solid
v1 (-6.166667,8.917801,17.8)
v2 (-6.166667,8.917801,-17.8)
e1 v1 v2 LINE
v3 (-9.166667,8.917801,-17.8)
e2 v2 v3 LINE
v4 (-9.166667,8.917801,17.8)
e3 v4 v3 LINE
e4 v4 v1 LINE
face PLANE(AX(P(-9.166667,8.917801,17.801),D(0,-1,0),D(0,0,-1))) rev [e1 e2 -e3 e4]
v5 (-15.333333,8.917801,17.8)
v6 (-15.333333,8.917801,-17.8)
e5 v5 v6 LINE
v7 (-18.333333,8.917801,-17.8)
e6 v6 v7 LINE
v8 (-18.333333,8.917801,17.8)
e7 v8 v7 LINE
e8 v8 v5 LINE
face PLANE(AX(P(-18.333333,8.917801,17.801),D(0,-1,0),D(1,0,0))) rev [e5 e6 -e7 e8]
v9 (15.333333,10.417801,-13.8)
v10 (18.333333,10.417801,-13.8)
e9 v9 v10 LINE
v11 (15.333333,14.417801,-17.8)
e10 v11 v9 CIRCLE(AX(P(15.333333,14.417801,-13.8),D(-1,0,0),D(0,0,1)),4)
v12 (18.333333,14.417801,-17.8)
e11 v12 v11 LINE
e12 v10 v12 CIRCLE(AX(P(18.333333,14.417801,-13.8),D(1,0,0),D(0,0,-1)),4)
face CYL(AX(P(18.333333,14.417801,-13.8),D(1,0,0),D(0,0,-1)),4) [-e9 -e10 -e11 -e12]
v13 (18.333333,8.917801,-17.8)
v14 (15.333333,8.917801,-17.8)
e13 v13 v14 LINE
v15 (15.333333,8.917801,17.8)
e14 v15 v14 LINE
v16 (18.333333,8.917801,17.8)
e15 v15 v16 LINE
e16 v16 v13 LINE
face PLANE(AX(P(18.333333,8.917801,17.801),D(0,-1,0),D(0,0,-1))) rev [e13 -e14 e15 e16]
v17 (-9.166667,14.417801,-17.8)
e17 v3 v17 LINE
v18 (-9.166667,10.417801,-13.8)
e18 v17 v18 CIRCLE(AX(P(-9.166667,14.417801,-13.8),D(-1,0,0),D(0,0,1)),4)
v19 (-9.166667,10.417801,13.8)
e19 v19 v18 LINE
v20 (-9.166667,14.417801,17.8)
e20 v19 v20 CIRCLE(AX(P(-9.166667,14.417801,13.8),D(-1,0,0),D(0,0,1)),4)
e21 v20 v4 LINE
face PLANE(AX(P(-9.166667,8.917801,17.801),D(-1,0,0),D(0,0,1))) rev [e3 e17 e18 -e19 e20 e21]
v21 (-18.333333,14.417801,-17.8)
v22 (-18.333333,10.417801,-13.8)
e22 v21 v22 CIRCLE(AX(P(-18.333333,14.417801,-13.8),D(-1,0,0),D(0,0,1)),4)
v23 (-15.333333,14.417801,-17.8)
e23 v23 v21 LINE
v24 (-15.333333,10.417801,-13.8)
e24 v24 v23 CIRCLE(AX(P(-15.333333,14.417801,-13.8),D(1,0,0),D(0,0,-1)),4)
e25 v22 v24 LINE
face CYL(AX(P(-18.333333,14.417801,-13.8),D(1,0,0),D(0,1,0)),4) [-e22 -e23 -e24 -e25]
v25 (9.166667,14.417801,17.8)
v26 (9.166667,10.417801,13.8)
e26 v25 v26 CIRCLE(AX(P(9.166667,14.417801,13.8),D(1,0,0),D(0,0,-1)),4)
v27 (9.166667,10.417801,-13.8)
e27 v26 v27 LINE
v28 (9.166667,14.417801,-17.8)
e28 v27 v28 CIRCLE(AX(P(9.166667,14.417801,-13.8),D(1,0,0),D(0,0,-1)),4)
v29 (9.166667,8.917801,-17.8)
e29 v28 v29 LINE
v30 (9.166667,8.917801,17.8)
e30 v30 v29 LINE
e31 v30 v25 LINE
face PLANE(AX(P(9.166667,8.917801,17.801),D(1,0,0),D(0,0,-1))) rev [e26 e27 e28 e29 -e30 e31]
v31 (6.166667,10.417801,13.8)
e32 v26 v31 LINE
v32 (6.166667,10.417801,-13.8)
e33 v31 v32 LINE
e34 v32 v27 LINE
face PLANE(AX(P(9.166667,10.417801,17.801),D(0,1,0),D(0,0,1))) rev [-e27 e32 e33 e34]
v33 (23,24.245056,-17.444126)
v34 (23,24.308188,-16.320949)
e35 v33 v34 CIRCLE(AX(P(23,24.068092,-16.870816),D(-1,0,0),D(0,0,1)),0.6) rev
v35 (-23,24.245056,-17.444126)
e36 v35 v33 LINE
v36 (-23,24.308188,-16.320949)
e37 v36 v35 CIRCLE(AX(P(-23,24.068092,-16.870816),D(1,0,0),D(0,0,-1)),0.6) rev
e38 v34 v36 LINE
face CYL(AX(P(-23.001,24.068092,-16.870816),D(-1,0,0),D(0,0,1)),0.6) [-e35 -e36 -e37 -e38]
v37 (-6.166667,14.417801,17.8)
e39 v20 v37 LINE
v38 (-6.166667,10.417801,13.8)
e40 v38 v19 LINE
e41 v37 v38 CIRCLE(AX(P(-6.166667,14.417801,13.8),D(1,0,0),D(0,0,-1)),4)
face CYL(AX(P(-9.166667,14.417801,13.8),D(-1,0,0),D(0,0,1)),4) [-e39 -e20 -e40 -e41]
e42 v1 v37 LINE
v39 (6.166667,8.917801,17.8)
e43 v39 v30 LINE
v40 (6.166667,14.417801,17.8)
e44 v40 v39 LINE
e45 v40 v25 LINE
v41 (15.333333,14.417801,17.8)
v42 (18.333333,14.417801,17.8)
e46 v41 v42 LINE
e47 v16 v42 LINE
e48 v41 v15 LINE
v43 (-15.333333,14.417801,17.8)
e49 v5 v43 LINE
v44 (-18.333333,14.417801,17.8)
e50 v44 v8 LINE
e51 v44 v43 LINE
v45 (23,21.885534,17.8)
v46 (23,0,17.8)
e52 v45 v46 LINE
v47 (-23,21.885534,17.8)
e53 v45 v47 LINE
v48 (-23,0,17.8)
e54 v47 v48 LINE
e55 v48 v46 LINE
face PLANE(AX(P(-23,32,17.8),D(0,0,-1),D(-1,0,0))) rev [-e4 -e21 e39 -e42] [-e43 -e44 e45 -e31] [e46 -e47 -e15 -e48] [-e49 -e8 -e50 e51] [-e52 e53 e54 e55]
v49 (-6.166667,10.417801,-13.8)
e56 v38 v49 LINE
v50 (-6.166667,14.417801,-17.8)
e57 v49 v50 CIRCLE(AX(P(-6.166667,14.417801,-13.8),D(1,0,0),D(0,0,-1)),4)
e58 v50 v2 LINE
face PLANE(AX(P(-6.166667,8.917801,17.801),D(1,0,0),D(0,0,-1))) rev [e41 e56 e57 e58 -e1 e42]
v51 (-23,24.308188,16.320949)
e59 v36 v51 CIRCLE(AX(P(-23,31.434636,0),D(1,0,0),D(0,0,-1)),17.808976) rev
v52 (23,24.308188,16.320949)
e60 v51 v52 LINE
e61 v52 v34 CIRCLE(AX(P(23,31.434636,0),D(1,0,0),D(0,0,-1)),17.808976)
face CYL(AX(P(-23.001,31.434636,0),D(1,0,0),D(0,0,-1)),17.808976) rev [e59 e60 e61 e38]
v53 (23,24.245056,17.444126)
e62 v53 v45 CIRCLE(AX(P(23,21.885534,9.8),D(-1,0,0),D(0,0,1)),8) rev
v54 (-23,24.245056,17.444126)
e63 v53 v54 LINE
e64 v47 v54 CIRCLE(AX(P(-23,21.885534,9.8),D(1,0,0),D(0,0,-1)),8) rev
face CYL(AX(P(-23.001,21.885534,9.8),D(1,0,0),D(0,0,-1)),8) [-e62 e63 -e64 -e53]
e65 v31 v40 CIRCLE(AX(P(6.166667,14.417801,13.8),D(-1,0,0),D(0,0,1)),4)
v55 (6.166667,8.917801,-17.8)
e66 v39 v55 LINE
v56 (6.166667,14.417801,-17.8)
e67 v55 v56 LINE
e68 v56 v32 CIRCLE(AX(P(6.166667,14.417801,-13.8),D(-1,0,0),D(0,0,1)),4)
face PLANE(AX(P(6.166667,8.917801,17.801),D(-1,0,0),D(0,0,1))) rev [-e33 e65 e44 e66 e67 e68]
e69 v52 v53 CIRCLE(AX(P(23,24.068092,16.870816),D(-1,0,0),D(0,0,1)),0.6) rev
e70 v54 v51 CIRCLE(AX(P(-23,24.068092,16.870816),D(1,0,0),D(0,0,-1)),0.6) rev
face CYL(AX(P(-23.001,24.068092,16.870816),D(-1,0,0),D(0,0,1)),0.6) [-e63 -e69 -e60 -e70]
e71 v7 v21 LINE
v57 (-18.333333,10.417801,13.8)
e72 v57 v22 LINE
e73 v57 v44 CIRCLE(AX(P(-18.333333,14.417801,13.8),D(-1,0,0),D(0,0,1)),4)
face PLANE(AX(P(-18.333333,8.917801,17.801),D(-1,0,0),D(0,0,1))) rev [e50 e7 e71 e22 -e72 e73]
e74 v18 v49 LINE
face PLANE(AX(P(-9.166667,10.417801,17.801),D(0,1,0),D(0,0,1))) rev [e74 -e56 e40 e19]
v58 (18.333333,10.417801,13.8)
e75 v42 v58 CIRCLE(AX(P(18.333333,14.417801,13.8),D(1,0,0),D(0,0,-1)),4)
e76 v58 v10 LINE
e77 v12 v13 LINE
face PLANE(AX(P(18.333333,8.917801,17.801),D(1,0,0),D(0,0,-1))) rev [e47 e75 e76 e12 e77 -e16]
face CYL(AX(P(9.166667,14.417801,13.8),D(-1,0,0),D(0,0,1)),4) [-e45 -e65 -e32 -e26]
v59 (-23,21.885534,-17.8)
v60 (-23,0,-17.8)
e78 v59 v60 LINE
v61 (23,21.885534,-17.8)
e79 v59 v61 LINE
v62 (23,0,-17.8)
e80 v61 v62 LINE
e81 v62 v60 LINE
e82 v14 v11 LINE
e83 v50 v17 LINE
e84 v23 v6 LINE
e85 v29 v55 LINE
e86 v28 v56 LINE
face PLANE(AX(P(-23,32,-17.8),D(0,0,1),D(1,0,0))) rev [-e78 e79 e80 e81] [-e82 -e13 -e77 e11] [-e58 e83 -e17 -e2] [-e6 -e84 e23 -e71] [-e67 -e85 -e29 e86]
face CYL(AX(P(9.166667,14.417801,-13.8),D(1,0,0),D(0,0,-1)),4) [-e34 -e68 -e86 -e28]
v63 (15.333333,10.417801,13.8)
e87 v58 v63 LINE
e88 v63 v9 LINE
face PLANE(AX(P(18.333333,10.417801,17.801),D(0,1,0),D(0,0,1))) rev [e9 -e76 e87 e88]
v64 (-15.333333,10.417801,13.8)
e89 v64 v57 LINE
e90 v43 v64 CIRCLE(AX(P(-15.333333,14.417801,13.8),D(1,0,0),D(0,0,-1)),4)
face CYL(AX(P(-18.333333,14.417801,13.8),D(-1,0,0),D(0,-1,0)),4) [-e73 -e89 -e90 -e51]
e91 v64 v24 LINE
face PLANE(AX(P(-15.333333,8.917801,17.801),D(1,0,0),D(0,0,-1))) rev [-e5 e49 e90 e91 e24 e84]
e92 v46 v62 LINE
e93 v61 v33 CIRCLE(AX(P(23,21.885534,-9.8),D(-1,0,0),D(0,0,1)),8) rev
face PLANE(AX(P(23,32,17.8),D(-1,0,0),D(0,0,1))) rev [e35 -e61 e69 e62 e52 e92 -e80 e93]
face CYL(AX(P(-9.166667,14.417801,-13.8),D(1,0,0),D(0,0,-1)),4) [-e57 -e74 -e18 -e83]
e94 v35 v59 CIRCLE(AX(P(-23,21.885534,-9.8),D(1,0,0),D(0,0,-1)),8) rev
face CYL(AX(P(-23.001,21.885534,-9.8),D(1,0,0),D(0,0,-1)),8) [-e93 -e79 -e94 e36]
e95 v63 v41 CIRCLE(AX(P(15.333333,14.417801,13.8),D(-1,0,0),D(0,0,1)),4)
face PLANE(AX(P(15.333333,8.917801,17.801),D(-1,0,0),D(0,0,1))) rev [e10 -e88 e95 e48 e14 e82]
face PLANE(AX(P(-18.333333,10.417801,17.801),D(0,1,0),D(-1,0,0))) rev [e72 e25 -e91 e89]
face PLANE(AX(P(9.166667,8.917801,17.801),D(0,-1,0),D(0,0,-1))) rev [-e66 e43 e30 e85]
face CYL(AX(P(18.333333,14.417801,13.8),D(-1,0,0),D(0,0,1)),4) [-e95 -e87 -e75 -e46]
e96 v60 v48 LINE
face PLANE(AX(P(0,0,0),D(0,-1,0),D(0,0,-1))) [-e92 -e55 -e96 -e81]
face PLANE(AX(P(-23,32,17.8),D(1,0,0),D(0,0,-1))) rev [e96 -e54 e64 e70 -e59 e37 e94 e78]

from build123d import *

# Parameters (mm, degrees)
SKETCH2_W           = 46
SKETCH2_H           = 35.6
BOSS_EXTRUDE1_DEPTH = 32
CUT_EXTRUDE2_REACH  = 60.795
CUT_EXTRUDE3_REACH  = 51.55
SKETCH4_W           = 3
SKETCH4_H           = 1.5
FILLET1_R           = 4
FILLET2_R           = 8
FILLET3_R           = 0.6


with BuildPart() as part:
    # Sketch2 → Boss-Extrude1 (new body)
    with BuildSketch(Plane(origin=(0, 0, 0), x_dir=(1, 0, 0), z_dir=(0, 1, 0))):
        Rectangle(SKETCH2_W, SKETCH2_H)
    extrude(amount=BOSS_EXTRUDE1_DEPTH)

    # Sketch3 → Cut-Extrude2 (cut, up to next)
    with BuildSketch(Plane(origin=(23, 0, 0), x_dir=(0, 0, -1), z_dir=(1, 0, 0)), mode=Mode.PRIVATE) as cut_extrude2_sk1:
        with BuildLine():
            Line((-17.8, 25.6678015), (-16.849429134, 25.6678015))
            ThreePointArc((-16.849429134, 25.6678015), (0, 13.625659234), (16.849429134, 25.6678015))
            Line((16.849429134, 25.6678015), (17.8, 25.6678015))
            Line((17.8, 25.6678015), (17.8, 32))
            Line((17.8, 32), (-17.8, 32))
            Line((-17.8, 32), (-17.8, 25.6678015))
        make_face()
    cut_extrude2_tool1 = extrude(cut_extrude2_sk1.sketch, amount=-CUT_EXTRUDE2_REACH, mode=Mode.PRIVATE) & part.part
    add(cut_extrude2_tool1.solids().sort_by_distance((23, 24.200301, 0))[0], mode=Mode.SUBTRACT)

    # Sketch4 → Cut-Extrude3 (cut, up to next)
    with BuildSketch(Plane(origin=(0, 0, -17.8), x_dir=(-1, 0, 0), z_dir=(0, 0, -1)), mode=Mode.PRIVATE) as cut_extrude3_sk1:
        with Locations((-16.833333333, 9.6678015)):
            Rectangle(SKETCH4_W, SKETCH4_H)
    cut_extrude3_tool1 = extrude(cut_extrude3_sk1.sketch, amount=-CUT_EXTRUDE3_REACH, mode=Mode.PRIVATE) & part.part
    # Sketch4 → Cut-Extrude3 (cut, up to next)
    with BuildSketch(Plane(origin=(0, 0, -17.8), x_dir=(-1, 0, 0), z_dir=(0, 0, -1)), mode=Mode.PRIVATE) as cut_extrude3_sk2:
        with Locations((-7.666666667, 9.6678015)):
            Rectangle(SKETCH4_W, SKETCH4_H)
    cut_extrude3_tool2 = extrude(cut_extrude3_sk2.sketch, amount=-CUT_EXTRUDE3_REACH, mode=Mode.PRIVATE) & part.part
    # Sketch4 → Cut-Extrude3 (cut, up to next)
    with BuildSketch(Plane(origin=(0, 0, -17.8), x_dir=(-1, 0, 0), z_dir=(0, 0, -1)), mode=Mode.PRIVATE) as cut_extrude3_sk3:
        with Locations((7.666666667, 9.6678015)):
            Rectangle(SKETCH4_W, SKETCH4_H)
    cut_extrude3_tool3 = extrude(cut_extrude3_sk3.sketch, amount=-CUT_EXTRUDE3_REACH, mode=Mode.PRIVATE) & part.part
    # Sketch4 → Cut-Extrude3 (cut, up to next)
    with BuildSketch(Plane(origin=(0, 0, -17.8), x_dir=(-1, 0, 0), z_dir=(0, 0, -1)), mode=Mode.PRIVATE) as cut_extrude3_sk4:
        with Locations((16.833333333, 9.6678015)):
            Rectangle(SKETCH4_W, SKETCH4_H)
    cut_extrude3_tool4 = extrude(cut_extrude3_sk4.sketch, amount=-CUT_EXTRUDE3_REACH, mode=Mode.PRIVATE) & part.part
    add(cut_extrude3_tool1.solids().sort_by_distance((16.833333, 9.667801, -17.8))[0], mode=Mode.SUBTRACT)
    add(cut_extrude3_tool2.solids().sort_by_distance((7.666667, 9.667801, -17.8))[0], mode=Mode.SUBTRACT)
    add(cut_extrude3_tool3.solids().sort_by_distance((-7.666667, 9.667801, -17.8))[0], mode=Mode.SUBTRACT)
    add(cut_extrude3_tool4.solids().sort_by_distance((-16.833333, 9.667801, -17.8))[0], mode=Mode.SUBTRACT)

    # Fillet1
    fillet1_edges = [part.edges().sort_by_distance(p)[0] for p in [
        (16.833333333, 10.4178015, -17.8),
        (16.833333333, 10.4178015, 17.8),
        (7.666666667, 10.4178015, -17.8),
        (7.666666667, 10.4178015, 17.8),
        (-7.666666667, 10.4178015, -17.8),
        (-7.666666667, 10.4178015, 17.8),
        (-16.833333333, 10.4178015, -17.8),
        (-16.833333333, 10.4178015, 17.8),
    ]]
    fillet(fillet1_edges, radius=FILLET1_R)

    # Fillet2
    # the kernel refuses this fillet: 8 mm, written as the material it takes off along each edge
    with BuildSketch(Plane(origin=(32.455669225, 25.6678015, 17.8), x_dir=(0, -1, 0), z_dir=(-1, 0, 0))) as fillet2_piece_1:
        with BuildLine():
            CenterArc((3.78226769, -8), FILLET2_R, 90, 28.215129255)
            Line((0, -0.950570866), (-0.075645354, -0.809582283))
            ThreePointArc((-0.075645354, -0.809582283), (-0.16, -0.475285433), (-0.16, 0))
            Line((-0.16, 0), (0, 0.16))
            Line((0, 0.16), (3.78226769, 0.16))
            Line((3.78226769, 0.16), (3.78226769, 0))
        make_face()
    extrude(amount=64.91133845, mode=Mode.SUBTRACT)
    with BuildSketch(Plane(origin=(32.455669225, 25.6678015, -17.8), x_dir=(0, -1, 0), z_dir=(-1, 0, 0))) as fillet2_piece_2:
        with BuildLine():
            CenterArc((3.78226769, 8), FILLET2_R, 241.784870745, 28.215129255)
            Line((0, 0.950570866), (-0.075645354, 0.809582283))
            ThreePointArc((-0.075645354, 0.809582283), (-0.16, 0.475285433), (-0.16, 0))
            Line((-0.16, 0), (0, -0.16))
            Line((0, -0.16), (3.78226769, -0.16))
            Line((3.78226769, -0.16), (3.78226769, 0))
        make_face()
    extrude(amount=64.91133845, mode=Mode.SUBTRACT)

    # Fillet3
    fillet3_edges = [part.edges().sort_by_distance(p)[0] for p in [
        (0, 25.6678015, -16.849429134),
        (0, 25.6678015, 16.849429134),
    ]]
    fillet(fillet3_edges, radius=FILLET3_R)


solid = part.part
